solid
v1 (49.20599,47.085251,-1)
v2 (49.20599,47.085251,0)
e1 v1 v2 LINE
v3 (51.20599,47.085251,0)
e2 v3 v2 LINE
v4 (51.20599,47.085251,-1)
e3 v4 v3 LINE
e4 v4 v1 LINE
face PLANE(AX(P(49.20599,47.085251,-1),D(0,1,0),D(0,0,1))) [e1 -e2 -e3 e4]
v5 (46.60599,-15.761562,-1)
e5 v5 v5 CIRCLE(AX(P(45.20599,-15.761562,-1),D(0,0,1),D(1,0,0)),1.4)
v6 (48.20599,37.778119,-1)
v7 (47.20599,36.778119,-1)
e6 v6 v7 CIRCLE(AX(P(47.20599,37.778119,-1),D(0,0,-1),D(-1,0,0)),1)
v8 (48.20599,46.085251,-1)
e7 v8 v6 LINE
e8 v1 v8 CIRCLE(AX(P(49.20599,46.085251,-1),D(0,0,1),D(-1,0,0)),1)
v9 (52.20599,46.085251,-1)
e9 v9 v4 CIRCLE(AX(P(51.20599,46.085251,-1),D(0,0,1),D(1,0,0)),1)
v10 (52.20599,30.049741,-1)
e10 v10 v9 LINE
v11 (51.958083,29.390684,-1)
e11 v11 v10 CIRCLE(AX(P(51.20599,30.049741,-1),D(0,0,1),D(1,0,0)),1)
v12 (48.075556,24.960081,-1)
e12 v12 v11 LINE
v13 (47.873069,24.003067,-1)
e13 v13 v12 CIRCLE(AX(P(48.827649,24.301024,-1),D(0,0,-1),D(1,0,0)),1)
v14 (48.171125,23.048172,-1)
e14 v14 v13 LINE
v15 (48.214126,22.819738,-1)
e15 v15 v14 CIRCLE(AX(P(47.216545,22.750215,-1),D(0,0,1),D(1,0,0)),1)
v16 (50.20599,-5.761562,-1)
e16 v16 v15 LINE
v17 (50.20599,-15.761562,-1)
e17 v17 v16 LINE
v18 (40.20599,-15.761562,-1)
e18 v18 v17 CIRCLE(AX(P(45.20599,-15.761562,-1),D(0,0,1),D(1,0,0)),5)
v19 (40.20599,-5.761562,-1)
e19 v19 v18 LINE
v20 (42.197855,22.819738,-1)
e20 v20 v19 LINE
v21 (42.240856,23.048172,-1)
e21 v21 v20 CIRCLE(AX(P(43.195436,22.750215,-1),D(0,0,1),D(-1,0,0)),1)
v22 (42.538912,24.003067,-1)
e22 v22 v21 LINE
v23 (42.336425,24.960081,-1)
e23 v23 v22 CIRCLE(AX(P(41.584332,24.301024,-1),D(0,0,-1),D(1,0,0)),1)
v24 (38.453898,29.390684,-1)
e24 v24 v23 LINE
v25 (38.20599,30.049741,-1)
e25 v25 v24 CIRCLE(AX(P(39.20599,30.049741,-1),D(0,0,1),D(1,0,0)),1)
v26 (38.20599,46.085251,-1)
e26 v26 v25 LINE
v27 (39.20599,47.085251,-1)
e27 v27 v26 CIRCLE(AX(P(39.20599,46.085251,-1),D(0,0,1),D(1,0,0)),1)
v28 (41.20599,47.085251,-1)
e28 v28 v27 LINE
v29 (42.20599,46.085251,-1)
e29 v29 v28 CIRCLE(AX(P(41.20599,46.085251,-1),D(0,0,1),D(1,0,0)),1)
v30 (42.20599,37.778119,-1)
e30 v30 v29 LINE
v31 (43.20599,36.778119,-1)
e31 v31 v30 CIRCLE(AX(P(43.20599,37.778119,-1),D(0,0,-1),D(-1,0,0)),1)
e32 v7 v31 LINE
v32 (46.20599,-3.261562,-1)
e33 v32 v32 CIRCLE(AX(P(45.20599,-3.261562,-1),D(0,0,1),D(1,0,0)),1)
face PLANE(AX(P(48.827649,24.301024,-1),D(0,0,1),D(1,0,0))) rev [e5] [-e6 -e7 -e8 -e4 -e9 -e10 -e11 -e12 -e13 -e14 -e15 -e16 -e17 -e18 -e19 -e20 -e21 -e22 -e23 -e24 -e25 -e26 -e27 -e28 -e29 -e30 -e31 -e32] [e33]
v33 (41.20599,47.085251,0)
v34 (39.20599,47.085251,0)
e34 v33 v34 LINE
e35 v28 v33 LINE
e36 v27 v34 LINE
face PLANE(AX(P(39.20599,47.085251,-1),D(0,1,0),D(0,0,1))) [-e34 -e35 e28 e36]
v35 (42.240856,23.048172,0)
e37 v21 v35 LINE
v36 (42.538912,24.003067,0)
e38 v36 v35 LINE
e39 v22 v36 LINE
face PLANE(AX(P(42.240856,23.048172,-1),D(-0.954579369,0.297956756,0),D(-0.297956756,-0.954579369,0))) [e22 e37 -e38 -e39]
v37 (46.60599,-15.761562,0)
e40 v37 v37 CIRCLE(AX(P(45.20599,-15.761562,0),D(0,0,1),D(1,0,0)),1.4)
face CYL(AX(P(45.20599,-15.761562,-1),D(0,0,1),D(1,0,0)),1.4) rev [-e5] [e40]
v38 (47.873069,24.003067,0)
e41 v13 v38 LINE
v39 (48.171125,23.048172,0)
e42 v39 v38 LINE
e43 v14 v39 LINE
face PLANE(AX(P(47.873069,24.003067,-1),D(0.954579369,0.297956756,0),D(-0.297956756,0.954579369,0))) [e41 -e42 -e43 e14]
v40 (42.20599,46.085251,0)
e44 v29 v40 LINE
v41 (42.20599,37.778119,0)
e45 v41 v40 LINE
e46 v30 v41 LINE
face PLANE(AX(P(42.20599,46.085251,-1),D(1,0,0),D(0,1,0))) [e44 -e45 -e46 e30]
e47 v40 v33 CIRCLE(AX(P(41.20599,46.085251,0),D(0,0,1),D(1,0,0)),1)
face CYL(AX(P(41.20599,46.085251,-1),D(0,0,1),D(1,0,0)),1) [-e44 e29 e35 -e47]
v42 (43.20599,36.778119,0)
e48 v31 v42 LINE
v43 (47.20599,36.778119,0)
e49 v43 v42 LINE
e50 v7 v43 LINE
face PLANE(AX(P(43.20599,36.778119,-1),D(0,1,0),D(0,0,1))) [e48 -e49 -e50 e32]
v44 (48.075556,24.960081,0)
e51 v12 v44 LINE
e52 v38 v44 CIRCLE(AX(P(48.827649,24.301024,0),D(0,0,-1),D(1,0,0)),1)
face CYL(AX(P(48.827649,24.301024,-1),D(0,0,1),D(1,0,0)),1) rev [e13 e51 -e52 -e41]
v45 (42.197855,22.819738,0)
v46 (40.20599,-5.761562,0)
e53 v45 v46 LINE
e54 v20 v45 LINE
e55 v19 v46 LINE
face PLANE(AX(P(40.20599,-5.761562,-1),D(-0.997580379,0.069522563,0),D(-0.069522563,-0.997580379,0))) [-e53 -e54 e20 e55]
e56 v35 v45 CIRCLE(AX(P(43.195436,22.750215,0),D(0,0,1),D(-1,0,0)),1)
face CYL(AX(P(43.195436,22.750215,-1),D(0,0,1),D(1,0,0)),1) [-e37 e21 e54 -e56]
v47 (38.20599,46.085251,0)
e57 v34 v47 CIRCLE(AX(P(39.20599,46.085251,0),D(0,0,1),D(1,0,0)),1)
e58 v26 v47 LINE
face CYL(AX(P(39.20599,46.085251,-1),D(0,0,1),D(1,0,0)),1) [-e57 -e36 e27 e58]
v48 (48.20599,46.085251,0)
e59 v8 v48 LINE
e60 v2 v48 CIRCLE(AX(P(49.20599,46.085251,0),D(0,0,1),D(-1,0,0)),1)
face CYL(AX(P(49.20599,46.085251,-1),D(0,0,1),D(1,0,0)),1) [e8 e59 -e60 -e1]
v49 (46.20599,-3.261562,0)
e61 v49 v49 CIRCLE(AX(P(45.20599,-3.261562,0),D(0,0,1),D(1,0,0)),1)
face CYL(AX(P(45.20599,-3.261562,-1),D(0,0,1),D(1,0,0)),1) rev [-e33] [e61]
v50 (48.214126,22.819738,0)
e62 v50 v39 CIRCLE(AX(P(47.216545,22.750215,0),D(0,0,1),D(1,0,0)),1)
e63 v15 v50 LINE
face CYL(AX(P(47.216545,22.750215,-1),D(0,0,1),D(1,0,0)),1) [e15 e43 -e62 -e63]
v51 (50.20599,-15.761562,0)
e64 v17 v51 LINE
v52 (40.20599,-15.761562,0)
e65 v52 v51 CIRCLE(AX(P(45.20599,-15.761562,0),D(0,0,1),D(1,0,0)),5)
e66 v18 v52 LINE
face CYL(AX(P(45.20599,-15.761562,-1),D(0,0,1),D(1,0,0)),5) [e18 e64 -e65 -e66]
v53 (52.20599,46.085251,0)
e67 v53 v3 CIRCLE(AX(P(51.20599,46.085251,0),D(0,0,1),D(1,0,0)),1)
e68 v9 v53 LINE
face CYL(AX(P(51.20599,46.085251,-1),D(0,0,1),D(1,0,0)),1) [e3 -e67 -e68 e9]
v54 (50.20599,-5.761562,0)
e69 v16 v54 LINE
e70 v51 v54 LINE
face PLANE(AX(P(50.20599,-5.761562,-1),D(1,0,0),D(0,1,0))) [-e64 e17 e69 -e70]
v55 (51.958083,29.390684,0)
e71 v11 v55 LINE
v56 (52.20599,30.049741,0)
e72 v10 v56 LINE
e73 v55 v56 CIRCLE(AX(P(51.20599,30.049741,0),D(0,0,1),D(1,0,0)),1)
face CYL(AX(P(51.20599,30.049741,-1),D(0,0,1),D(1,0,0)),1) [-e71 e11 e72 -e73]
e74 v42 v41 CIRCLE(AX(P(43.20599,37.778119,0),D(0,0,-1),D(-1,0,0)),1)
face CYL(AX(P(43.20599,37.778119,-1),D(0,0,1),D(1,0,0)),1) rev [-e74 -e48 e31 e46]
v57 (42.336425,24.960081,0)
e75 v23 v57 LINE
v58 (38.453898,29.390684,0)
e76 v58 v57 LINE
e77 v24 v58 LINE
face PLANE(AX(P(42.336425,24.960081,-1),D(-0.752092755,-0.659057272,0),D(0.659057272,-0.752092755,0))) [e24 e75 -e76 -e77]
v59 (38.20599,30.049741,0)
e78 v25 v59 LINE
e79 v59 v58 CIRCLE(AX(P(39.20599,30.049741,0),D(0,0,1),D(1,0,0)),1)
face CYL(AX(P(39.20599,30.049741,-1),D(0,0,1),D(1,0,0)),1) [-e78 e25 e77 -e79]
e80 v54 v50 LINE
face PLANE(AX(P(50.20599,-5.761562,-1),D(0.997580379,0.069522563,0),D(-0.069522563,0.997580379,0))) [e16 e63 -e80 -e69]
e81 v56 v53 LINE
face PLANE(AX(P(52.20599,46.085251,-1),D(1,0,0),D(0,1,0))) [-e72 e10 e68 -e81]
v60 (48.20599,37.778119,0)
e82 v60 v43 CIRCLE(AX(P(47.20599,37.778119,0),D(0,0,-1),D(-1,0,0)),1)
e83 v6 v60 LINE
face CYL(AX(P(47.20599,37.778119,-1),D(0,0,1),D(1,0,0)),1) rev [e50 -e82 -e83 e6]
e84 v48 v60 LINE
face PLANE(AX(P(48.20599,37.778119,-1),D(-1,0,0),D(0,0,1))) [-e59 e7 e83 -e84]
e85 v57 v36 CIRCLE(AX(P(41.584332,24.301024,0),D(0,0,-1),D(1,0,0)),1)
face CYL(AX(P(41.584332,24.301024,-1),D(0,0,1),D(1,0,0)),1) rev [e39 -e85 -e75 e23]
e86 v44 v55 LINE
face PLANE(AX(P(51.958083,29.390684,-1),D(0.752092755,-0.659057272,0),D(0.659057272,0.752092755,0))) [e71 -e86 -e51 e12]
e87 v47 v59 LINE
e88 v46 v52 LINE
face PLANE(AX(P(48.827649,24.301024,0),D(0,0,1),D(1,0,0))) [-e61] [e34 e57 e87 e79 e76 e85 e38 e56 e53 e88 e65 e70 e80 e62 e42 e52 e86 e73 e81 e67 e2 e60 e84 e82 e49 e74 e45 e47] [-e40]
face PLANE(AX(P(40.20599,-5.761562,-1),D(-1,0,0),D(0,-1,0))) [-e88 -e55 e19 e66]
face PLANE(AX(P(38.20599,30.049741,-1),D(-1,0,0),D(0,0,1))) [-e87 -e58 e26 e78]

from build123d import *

# Parameters (mm, degrees)
MODEL_R           = 1.4
MODEL_R_2         = 1
BRIDA_BASE1_DEPTH = 1


# Sheet-metal steps are written as plain solids
with BuildPart() as part:
    # Model → Brida base1 (new body)
    with BuildSketch(Plane.XY):
        with BuildLine():
            Line((40.2059904, -5.7615616), (42.197855138, 22.819737764))
            ThreePointArc((42.197855138, 22.819737764), (42.212695742, 22.935208537), (42.240856149, 23.048171958))
            Line((42.240856149, 23.048171958), (42.538911562, 24.003067399))
            ThreePointArc((42.538911562, 24.003067399), (42.562673339, 24.508023196), (42.336424948, 24.960081427))
            Line((42.336424948, 24.960081427), (38.453897645, 29.390683716))
            ThreePointArc((38.453897645, 29.390683716), (38.270016908, 29.697670508), (38.2059904, 30.049740987))
            Line((38.2059904, 30.049740987), (38.2059904, 46.085251303))
            ThreePointArc((38.2059904, 46.085251303), (38.498883619, 46.792358084), (39.2059904, 47.085251303))
            Line((39.2059904, 47.085251303), (41.2059904, 47.085251303))
            ThreePointArc((41.2059904, 47.085251303), (41.913097181, 46.792358084), (42.2059904, 46.085251303))
            Line((42.2059904, 46.085251303), (42.2059904, 37.778119438))
            ThreePointArc((42.2059904, 37.778119438), (42.498883619, 37.071012657), (43.2059904, 36.778119438))
            Line((43.2059904, 36.778119438), (47.2059904, 36.778119438))
            ThreePointArc((47.2059904, 36.778119438), (47.913097181, 37.071012657), (48.2059904, 37.778119438))
            Line((48.2059904, 37.778119438), (48.2059904, 46.085251303))
            ThreePointArc((48.2059904, 46.085251303), (48.498883619, 46.792358084), (49.2059904, 47.085251303))
            Line((49.2059904, 47.085251303), (51.2059904, 47.085251303))
            ThreePointArc((51.2059904, 47.085251303), (51.913097181, 46.792358084), (52.2059904, 46.085251303))
            Line((52.2059904, 46.085251303), (52.2059904, 30.049740987))
            ThreePointArc((52.2059904, 30.049740987), (52.141963892, 29.697670508), (51.958083155, 29.390683716))
            Line((51.958083155, 29.390683716), (48.075555852, 24.960081427))
            ThreePointArc((48.075555852, 24.960081427), (47.849307461, 24.508023196), (47.873069238, 24.003067399))
            Line((47.873069238, 24.003067399), (48.171124651, 23.048171958))
            ThreePointArc((48.171124651, 23.048171958), (48.199285058, 22.935208537), (48.214125662, 22.819737764))
            Line((48.214125662, 22.819737764), (50.2059904, -5.7615616))
            Line((50.2059904, -5.7615616), (50.2059904, -15.7615616))
            ThreePointArc((50.2059904, -15.7615616), (45.2059904, -20.7615616), (40.2059904, -15.7615616))
            Line((40.2059904, -15.7615616), (40.2059904, -5.7615616))
        make_face()
        with Locations((45.2059904, -15.7615616)):
            Circle(MODEL_R, mode=Mode.SUBTRACT)
        with Locations((45.2059904, -3.2615616)):
            Circle(MODEL_R_2, mode=Mode.SUBTRACT)
    extrude(amount=-BRIDA_BASE1_DEPTH)


solid = part.part
